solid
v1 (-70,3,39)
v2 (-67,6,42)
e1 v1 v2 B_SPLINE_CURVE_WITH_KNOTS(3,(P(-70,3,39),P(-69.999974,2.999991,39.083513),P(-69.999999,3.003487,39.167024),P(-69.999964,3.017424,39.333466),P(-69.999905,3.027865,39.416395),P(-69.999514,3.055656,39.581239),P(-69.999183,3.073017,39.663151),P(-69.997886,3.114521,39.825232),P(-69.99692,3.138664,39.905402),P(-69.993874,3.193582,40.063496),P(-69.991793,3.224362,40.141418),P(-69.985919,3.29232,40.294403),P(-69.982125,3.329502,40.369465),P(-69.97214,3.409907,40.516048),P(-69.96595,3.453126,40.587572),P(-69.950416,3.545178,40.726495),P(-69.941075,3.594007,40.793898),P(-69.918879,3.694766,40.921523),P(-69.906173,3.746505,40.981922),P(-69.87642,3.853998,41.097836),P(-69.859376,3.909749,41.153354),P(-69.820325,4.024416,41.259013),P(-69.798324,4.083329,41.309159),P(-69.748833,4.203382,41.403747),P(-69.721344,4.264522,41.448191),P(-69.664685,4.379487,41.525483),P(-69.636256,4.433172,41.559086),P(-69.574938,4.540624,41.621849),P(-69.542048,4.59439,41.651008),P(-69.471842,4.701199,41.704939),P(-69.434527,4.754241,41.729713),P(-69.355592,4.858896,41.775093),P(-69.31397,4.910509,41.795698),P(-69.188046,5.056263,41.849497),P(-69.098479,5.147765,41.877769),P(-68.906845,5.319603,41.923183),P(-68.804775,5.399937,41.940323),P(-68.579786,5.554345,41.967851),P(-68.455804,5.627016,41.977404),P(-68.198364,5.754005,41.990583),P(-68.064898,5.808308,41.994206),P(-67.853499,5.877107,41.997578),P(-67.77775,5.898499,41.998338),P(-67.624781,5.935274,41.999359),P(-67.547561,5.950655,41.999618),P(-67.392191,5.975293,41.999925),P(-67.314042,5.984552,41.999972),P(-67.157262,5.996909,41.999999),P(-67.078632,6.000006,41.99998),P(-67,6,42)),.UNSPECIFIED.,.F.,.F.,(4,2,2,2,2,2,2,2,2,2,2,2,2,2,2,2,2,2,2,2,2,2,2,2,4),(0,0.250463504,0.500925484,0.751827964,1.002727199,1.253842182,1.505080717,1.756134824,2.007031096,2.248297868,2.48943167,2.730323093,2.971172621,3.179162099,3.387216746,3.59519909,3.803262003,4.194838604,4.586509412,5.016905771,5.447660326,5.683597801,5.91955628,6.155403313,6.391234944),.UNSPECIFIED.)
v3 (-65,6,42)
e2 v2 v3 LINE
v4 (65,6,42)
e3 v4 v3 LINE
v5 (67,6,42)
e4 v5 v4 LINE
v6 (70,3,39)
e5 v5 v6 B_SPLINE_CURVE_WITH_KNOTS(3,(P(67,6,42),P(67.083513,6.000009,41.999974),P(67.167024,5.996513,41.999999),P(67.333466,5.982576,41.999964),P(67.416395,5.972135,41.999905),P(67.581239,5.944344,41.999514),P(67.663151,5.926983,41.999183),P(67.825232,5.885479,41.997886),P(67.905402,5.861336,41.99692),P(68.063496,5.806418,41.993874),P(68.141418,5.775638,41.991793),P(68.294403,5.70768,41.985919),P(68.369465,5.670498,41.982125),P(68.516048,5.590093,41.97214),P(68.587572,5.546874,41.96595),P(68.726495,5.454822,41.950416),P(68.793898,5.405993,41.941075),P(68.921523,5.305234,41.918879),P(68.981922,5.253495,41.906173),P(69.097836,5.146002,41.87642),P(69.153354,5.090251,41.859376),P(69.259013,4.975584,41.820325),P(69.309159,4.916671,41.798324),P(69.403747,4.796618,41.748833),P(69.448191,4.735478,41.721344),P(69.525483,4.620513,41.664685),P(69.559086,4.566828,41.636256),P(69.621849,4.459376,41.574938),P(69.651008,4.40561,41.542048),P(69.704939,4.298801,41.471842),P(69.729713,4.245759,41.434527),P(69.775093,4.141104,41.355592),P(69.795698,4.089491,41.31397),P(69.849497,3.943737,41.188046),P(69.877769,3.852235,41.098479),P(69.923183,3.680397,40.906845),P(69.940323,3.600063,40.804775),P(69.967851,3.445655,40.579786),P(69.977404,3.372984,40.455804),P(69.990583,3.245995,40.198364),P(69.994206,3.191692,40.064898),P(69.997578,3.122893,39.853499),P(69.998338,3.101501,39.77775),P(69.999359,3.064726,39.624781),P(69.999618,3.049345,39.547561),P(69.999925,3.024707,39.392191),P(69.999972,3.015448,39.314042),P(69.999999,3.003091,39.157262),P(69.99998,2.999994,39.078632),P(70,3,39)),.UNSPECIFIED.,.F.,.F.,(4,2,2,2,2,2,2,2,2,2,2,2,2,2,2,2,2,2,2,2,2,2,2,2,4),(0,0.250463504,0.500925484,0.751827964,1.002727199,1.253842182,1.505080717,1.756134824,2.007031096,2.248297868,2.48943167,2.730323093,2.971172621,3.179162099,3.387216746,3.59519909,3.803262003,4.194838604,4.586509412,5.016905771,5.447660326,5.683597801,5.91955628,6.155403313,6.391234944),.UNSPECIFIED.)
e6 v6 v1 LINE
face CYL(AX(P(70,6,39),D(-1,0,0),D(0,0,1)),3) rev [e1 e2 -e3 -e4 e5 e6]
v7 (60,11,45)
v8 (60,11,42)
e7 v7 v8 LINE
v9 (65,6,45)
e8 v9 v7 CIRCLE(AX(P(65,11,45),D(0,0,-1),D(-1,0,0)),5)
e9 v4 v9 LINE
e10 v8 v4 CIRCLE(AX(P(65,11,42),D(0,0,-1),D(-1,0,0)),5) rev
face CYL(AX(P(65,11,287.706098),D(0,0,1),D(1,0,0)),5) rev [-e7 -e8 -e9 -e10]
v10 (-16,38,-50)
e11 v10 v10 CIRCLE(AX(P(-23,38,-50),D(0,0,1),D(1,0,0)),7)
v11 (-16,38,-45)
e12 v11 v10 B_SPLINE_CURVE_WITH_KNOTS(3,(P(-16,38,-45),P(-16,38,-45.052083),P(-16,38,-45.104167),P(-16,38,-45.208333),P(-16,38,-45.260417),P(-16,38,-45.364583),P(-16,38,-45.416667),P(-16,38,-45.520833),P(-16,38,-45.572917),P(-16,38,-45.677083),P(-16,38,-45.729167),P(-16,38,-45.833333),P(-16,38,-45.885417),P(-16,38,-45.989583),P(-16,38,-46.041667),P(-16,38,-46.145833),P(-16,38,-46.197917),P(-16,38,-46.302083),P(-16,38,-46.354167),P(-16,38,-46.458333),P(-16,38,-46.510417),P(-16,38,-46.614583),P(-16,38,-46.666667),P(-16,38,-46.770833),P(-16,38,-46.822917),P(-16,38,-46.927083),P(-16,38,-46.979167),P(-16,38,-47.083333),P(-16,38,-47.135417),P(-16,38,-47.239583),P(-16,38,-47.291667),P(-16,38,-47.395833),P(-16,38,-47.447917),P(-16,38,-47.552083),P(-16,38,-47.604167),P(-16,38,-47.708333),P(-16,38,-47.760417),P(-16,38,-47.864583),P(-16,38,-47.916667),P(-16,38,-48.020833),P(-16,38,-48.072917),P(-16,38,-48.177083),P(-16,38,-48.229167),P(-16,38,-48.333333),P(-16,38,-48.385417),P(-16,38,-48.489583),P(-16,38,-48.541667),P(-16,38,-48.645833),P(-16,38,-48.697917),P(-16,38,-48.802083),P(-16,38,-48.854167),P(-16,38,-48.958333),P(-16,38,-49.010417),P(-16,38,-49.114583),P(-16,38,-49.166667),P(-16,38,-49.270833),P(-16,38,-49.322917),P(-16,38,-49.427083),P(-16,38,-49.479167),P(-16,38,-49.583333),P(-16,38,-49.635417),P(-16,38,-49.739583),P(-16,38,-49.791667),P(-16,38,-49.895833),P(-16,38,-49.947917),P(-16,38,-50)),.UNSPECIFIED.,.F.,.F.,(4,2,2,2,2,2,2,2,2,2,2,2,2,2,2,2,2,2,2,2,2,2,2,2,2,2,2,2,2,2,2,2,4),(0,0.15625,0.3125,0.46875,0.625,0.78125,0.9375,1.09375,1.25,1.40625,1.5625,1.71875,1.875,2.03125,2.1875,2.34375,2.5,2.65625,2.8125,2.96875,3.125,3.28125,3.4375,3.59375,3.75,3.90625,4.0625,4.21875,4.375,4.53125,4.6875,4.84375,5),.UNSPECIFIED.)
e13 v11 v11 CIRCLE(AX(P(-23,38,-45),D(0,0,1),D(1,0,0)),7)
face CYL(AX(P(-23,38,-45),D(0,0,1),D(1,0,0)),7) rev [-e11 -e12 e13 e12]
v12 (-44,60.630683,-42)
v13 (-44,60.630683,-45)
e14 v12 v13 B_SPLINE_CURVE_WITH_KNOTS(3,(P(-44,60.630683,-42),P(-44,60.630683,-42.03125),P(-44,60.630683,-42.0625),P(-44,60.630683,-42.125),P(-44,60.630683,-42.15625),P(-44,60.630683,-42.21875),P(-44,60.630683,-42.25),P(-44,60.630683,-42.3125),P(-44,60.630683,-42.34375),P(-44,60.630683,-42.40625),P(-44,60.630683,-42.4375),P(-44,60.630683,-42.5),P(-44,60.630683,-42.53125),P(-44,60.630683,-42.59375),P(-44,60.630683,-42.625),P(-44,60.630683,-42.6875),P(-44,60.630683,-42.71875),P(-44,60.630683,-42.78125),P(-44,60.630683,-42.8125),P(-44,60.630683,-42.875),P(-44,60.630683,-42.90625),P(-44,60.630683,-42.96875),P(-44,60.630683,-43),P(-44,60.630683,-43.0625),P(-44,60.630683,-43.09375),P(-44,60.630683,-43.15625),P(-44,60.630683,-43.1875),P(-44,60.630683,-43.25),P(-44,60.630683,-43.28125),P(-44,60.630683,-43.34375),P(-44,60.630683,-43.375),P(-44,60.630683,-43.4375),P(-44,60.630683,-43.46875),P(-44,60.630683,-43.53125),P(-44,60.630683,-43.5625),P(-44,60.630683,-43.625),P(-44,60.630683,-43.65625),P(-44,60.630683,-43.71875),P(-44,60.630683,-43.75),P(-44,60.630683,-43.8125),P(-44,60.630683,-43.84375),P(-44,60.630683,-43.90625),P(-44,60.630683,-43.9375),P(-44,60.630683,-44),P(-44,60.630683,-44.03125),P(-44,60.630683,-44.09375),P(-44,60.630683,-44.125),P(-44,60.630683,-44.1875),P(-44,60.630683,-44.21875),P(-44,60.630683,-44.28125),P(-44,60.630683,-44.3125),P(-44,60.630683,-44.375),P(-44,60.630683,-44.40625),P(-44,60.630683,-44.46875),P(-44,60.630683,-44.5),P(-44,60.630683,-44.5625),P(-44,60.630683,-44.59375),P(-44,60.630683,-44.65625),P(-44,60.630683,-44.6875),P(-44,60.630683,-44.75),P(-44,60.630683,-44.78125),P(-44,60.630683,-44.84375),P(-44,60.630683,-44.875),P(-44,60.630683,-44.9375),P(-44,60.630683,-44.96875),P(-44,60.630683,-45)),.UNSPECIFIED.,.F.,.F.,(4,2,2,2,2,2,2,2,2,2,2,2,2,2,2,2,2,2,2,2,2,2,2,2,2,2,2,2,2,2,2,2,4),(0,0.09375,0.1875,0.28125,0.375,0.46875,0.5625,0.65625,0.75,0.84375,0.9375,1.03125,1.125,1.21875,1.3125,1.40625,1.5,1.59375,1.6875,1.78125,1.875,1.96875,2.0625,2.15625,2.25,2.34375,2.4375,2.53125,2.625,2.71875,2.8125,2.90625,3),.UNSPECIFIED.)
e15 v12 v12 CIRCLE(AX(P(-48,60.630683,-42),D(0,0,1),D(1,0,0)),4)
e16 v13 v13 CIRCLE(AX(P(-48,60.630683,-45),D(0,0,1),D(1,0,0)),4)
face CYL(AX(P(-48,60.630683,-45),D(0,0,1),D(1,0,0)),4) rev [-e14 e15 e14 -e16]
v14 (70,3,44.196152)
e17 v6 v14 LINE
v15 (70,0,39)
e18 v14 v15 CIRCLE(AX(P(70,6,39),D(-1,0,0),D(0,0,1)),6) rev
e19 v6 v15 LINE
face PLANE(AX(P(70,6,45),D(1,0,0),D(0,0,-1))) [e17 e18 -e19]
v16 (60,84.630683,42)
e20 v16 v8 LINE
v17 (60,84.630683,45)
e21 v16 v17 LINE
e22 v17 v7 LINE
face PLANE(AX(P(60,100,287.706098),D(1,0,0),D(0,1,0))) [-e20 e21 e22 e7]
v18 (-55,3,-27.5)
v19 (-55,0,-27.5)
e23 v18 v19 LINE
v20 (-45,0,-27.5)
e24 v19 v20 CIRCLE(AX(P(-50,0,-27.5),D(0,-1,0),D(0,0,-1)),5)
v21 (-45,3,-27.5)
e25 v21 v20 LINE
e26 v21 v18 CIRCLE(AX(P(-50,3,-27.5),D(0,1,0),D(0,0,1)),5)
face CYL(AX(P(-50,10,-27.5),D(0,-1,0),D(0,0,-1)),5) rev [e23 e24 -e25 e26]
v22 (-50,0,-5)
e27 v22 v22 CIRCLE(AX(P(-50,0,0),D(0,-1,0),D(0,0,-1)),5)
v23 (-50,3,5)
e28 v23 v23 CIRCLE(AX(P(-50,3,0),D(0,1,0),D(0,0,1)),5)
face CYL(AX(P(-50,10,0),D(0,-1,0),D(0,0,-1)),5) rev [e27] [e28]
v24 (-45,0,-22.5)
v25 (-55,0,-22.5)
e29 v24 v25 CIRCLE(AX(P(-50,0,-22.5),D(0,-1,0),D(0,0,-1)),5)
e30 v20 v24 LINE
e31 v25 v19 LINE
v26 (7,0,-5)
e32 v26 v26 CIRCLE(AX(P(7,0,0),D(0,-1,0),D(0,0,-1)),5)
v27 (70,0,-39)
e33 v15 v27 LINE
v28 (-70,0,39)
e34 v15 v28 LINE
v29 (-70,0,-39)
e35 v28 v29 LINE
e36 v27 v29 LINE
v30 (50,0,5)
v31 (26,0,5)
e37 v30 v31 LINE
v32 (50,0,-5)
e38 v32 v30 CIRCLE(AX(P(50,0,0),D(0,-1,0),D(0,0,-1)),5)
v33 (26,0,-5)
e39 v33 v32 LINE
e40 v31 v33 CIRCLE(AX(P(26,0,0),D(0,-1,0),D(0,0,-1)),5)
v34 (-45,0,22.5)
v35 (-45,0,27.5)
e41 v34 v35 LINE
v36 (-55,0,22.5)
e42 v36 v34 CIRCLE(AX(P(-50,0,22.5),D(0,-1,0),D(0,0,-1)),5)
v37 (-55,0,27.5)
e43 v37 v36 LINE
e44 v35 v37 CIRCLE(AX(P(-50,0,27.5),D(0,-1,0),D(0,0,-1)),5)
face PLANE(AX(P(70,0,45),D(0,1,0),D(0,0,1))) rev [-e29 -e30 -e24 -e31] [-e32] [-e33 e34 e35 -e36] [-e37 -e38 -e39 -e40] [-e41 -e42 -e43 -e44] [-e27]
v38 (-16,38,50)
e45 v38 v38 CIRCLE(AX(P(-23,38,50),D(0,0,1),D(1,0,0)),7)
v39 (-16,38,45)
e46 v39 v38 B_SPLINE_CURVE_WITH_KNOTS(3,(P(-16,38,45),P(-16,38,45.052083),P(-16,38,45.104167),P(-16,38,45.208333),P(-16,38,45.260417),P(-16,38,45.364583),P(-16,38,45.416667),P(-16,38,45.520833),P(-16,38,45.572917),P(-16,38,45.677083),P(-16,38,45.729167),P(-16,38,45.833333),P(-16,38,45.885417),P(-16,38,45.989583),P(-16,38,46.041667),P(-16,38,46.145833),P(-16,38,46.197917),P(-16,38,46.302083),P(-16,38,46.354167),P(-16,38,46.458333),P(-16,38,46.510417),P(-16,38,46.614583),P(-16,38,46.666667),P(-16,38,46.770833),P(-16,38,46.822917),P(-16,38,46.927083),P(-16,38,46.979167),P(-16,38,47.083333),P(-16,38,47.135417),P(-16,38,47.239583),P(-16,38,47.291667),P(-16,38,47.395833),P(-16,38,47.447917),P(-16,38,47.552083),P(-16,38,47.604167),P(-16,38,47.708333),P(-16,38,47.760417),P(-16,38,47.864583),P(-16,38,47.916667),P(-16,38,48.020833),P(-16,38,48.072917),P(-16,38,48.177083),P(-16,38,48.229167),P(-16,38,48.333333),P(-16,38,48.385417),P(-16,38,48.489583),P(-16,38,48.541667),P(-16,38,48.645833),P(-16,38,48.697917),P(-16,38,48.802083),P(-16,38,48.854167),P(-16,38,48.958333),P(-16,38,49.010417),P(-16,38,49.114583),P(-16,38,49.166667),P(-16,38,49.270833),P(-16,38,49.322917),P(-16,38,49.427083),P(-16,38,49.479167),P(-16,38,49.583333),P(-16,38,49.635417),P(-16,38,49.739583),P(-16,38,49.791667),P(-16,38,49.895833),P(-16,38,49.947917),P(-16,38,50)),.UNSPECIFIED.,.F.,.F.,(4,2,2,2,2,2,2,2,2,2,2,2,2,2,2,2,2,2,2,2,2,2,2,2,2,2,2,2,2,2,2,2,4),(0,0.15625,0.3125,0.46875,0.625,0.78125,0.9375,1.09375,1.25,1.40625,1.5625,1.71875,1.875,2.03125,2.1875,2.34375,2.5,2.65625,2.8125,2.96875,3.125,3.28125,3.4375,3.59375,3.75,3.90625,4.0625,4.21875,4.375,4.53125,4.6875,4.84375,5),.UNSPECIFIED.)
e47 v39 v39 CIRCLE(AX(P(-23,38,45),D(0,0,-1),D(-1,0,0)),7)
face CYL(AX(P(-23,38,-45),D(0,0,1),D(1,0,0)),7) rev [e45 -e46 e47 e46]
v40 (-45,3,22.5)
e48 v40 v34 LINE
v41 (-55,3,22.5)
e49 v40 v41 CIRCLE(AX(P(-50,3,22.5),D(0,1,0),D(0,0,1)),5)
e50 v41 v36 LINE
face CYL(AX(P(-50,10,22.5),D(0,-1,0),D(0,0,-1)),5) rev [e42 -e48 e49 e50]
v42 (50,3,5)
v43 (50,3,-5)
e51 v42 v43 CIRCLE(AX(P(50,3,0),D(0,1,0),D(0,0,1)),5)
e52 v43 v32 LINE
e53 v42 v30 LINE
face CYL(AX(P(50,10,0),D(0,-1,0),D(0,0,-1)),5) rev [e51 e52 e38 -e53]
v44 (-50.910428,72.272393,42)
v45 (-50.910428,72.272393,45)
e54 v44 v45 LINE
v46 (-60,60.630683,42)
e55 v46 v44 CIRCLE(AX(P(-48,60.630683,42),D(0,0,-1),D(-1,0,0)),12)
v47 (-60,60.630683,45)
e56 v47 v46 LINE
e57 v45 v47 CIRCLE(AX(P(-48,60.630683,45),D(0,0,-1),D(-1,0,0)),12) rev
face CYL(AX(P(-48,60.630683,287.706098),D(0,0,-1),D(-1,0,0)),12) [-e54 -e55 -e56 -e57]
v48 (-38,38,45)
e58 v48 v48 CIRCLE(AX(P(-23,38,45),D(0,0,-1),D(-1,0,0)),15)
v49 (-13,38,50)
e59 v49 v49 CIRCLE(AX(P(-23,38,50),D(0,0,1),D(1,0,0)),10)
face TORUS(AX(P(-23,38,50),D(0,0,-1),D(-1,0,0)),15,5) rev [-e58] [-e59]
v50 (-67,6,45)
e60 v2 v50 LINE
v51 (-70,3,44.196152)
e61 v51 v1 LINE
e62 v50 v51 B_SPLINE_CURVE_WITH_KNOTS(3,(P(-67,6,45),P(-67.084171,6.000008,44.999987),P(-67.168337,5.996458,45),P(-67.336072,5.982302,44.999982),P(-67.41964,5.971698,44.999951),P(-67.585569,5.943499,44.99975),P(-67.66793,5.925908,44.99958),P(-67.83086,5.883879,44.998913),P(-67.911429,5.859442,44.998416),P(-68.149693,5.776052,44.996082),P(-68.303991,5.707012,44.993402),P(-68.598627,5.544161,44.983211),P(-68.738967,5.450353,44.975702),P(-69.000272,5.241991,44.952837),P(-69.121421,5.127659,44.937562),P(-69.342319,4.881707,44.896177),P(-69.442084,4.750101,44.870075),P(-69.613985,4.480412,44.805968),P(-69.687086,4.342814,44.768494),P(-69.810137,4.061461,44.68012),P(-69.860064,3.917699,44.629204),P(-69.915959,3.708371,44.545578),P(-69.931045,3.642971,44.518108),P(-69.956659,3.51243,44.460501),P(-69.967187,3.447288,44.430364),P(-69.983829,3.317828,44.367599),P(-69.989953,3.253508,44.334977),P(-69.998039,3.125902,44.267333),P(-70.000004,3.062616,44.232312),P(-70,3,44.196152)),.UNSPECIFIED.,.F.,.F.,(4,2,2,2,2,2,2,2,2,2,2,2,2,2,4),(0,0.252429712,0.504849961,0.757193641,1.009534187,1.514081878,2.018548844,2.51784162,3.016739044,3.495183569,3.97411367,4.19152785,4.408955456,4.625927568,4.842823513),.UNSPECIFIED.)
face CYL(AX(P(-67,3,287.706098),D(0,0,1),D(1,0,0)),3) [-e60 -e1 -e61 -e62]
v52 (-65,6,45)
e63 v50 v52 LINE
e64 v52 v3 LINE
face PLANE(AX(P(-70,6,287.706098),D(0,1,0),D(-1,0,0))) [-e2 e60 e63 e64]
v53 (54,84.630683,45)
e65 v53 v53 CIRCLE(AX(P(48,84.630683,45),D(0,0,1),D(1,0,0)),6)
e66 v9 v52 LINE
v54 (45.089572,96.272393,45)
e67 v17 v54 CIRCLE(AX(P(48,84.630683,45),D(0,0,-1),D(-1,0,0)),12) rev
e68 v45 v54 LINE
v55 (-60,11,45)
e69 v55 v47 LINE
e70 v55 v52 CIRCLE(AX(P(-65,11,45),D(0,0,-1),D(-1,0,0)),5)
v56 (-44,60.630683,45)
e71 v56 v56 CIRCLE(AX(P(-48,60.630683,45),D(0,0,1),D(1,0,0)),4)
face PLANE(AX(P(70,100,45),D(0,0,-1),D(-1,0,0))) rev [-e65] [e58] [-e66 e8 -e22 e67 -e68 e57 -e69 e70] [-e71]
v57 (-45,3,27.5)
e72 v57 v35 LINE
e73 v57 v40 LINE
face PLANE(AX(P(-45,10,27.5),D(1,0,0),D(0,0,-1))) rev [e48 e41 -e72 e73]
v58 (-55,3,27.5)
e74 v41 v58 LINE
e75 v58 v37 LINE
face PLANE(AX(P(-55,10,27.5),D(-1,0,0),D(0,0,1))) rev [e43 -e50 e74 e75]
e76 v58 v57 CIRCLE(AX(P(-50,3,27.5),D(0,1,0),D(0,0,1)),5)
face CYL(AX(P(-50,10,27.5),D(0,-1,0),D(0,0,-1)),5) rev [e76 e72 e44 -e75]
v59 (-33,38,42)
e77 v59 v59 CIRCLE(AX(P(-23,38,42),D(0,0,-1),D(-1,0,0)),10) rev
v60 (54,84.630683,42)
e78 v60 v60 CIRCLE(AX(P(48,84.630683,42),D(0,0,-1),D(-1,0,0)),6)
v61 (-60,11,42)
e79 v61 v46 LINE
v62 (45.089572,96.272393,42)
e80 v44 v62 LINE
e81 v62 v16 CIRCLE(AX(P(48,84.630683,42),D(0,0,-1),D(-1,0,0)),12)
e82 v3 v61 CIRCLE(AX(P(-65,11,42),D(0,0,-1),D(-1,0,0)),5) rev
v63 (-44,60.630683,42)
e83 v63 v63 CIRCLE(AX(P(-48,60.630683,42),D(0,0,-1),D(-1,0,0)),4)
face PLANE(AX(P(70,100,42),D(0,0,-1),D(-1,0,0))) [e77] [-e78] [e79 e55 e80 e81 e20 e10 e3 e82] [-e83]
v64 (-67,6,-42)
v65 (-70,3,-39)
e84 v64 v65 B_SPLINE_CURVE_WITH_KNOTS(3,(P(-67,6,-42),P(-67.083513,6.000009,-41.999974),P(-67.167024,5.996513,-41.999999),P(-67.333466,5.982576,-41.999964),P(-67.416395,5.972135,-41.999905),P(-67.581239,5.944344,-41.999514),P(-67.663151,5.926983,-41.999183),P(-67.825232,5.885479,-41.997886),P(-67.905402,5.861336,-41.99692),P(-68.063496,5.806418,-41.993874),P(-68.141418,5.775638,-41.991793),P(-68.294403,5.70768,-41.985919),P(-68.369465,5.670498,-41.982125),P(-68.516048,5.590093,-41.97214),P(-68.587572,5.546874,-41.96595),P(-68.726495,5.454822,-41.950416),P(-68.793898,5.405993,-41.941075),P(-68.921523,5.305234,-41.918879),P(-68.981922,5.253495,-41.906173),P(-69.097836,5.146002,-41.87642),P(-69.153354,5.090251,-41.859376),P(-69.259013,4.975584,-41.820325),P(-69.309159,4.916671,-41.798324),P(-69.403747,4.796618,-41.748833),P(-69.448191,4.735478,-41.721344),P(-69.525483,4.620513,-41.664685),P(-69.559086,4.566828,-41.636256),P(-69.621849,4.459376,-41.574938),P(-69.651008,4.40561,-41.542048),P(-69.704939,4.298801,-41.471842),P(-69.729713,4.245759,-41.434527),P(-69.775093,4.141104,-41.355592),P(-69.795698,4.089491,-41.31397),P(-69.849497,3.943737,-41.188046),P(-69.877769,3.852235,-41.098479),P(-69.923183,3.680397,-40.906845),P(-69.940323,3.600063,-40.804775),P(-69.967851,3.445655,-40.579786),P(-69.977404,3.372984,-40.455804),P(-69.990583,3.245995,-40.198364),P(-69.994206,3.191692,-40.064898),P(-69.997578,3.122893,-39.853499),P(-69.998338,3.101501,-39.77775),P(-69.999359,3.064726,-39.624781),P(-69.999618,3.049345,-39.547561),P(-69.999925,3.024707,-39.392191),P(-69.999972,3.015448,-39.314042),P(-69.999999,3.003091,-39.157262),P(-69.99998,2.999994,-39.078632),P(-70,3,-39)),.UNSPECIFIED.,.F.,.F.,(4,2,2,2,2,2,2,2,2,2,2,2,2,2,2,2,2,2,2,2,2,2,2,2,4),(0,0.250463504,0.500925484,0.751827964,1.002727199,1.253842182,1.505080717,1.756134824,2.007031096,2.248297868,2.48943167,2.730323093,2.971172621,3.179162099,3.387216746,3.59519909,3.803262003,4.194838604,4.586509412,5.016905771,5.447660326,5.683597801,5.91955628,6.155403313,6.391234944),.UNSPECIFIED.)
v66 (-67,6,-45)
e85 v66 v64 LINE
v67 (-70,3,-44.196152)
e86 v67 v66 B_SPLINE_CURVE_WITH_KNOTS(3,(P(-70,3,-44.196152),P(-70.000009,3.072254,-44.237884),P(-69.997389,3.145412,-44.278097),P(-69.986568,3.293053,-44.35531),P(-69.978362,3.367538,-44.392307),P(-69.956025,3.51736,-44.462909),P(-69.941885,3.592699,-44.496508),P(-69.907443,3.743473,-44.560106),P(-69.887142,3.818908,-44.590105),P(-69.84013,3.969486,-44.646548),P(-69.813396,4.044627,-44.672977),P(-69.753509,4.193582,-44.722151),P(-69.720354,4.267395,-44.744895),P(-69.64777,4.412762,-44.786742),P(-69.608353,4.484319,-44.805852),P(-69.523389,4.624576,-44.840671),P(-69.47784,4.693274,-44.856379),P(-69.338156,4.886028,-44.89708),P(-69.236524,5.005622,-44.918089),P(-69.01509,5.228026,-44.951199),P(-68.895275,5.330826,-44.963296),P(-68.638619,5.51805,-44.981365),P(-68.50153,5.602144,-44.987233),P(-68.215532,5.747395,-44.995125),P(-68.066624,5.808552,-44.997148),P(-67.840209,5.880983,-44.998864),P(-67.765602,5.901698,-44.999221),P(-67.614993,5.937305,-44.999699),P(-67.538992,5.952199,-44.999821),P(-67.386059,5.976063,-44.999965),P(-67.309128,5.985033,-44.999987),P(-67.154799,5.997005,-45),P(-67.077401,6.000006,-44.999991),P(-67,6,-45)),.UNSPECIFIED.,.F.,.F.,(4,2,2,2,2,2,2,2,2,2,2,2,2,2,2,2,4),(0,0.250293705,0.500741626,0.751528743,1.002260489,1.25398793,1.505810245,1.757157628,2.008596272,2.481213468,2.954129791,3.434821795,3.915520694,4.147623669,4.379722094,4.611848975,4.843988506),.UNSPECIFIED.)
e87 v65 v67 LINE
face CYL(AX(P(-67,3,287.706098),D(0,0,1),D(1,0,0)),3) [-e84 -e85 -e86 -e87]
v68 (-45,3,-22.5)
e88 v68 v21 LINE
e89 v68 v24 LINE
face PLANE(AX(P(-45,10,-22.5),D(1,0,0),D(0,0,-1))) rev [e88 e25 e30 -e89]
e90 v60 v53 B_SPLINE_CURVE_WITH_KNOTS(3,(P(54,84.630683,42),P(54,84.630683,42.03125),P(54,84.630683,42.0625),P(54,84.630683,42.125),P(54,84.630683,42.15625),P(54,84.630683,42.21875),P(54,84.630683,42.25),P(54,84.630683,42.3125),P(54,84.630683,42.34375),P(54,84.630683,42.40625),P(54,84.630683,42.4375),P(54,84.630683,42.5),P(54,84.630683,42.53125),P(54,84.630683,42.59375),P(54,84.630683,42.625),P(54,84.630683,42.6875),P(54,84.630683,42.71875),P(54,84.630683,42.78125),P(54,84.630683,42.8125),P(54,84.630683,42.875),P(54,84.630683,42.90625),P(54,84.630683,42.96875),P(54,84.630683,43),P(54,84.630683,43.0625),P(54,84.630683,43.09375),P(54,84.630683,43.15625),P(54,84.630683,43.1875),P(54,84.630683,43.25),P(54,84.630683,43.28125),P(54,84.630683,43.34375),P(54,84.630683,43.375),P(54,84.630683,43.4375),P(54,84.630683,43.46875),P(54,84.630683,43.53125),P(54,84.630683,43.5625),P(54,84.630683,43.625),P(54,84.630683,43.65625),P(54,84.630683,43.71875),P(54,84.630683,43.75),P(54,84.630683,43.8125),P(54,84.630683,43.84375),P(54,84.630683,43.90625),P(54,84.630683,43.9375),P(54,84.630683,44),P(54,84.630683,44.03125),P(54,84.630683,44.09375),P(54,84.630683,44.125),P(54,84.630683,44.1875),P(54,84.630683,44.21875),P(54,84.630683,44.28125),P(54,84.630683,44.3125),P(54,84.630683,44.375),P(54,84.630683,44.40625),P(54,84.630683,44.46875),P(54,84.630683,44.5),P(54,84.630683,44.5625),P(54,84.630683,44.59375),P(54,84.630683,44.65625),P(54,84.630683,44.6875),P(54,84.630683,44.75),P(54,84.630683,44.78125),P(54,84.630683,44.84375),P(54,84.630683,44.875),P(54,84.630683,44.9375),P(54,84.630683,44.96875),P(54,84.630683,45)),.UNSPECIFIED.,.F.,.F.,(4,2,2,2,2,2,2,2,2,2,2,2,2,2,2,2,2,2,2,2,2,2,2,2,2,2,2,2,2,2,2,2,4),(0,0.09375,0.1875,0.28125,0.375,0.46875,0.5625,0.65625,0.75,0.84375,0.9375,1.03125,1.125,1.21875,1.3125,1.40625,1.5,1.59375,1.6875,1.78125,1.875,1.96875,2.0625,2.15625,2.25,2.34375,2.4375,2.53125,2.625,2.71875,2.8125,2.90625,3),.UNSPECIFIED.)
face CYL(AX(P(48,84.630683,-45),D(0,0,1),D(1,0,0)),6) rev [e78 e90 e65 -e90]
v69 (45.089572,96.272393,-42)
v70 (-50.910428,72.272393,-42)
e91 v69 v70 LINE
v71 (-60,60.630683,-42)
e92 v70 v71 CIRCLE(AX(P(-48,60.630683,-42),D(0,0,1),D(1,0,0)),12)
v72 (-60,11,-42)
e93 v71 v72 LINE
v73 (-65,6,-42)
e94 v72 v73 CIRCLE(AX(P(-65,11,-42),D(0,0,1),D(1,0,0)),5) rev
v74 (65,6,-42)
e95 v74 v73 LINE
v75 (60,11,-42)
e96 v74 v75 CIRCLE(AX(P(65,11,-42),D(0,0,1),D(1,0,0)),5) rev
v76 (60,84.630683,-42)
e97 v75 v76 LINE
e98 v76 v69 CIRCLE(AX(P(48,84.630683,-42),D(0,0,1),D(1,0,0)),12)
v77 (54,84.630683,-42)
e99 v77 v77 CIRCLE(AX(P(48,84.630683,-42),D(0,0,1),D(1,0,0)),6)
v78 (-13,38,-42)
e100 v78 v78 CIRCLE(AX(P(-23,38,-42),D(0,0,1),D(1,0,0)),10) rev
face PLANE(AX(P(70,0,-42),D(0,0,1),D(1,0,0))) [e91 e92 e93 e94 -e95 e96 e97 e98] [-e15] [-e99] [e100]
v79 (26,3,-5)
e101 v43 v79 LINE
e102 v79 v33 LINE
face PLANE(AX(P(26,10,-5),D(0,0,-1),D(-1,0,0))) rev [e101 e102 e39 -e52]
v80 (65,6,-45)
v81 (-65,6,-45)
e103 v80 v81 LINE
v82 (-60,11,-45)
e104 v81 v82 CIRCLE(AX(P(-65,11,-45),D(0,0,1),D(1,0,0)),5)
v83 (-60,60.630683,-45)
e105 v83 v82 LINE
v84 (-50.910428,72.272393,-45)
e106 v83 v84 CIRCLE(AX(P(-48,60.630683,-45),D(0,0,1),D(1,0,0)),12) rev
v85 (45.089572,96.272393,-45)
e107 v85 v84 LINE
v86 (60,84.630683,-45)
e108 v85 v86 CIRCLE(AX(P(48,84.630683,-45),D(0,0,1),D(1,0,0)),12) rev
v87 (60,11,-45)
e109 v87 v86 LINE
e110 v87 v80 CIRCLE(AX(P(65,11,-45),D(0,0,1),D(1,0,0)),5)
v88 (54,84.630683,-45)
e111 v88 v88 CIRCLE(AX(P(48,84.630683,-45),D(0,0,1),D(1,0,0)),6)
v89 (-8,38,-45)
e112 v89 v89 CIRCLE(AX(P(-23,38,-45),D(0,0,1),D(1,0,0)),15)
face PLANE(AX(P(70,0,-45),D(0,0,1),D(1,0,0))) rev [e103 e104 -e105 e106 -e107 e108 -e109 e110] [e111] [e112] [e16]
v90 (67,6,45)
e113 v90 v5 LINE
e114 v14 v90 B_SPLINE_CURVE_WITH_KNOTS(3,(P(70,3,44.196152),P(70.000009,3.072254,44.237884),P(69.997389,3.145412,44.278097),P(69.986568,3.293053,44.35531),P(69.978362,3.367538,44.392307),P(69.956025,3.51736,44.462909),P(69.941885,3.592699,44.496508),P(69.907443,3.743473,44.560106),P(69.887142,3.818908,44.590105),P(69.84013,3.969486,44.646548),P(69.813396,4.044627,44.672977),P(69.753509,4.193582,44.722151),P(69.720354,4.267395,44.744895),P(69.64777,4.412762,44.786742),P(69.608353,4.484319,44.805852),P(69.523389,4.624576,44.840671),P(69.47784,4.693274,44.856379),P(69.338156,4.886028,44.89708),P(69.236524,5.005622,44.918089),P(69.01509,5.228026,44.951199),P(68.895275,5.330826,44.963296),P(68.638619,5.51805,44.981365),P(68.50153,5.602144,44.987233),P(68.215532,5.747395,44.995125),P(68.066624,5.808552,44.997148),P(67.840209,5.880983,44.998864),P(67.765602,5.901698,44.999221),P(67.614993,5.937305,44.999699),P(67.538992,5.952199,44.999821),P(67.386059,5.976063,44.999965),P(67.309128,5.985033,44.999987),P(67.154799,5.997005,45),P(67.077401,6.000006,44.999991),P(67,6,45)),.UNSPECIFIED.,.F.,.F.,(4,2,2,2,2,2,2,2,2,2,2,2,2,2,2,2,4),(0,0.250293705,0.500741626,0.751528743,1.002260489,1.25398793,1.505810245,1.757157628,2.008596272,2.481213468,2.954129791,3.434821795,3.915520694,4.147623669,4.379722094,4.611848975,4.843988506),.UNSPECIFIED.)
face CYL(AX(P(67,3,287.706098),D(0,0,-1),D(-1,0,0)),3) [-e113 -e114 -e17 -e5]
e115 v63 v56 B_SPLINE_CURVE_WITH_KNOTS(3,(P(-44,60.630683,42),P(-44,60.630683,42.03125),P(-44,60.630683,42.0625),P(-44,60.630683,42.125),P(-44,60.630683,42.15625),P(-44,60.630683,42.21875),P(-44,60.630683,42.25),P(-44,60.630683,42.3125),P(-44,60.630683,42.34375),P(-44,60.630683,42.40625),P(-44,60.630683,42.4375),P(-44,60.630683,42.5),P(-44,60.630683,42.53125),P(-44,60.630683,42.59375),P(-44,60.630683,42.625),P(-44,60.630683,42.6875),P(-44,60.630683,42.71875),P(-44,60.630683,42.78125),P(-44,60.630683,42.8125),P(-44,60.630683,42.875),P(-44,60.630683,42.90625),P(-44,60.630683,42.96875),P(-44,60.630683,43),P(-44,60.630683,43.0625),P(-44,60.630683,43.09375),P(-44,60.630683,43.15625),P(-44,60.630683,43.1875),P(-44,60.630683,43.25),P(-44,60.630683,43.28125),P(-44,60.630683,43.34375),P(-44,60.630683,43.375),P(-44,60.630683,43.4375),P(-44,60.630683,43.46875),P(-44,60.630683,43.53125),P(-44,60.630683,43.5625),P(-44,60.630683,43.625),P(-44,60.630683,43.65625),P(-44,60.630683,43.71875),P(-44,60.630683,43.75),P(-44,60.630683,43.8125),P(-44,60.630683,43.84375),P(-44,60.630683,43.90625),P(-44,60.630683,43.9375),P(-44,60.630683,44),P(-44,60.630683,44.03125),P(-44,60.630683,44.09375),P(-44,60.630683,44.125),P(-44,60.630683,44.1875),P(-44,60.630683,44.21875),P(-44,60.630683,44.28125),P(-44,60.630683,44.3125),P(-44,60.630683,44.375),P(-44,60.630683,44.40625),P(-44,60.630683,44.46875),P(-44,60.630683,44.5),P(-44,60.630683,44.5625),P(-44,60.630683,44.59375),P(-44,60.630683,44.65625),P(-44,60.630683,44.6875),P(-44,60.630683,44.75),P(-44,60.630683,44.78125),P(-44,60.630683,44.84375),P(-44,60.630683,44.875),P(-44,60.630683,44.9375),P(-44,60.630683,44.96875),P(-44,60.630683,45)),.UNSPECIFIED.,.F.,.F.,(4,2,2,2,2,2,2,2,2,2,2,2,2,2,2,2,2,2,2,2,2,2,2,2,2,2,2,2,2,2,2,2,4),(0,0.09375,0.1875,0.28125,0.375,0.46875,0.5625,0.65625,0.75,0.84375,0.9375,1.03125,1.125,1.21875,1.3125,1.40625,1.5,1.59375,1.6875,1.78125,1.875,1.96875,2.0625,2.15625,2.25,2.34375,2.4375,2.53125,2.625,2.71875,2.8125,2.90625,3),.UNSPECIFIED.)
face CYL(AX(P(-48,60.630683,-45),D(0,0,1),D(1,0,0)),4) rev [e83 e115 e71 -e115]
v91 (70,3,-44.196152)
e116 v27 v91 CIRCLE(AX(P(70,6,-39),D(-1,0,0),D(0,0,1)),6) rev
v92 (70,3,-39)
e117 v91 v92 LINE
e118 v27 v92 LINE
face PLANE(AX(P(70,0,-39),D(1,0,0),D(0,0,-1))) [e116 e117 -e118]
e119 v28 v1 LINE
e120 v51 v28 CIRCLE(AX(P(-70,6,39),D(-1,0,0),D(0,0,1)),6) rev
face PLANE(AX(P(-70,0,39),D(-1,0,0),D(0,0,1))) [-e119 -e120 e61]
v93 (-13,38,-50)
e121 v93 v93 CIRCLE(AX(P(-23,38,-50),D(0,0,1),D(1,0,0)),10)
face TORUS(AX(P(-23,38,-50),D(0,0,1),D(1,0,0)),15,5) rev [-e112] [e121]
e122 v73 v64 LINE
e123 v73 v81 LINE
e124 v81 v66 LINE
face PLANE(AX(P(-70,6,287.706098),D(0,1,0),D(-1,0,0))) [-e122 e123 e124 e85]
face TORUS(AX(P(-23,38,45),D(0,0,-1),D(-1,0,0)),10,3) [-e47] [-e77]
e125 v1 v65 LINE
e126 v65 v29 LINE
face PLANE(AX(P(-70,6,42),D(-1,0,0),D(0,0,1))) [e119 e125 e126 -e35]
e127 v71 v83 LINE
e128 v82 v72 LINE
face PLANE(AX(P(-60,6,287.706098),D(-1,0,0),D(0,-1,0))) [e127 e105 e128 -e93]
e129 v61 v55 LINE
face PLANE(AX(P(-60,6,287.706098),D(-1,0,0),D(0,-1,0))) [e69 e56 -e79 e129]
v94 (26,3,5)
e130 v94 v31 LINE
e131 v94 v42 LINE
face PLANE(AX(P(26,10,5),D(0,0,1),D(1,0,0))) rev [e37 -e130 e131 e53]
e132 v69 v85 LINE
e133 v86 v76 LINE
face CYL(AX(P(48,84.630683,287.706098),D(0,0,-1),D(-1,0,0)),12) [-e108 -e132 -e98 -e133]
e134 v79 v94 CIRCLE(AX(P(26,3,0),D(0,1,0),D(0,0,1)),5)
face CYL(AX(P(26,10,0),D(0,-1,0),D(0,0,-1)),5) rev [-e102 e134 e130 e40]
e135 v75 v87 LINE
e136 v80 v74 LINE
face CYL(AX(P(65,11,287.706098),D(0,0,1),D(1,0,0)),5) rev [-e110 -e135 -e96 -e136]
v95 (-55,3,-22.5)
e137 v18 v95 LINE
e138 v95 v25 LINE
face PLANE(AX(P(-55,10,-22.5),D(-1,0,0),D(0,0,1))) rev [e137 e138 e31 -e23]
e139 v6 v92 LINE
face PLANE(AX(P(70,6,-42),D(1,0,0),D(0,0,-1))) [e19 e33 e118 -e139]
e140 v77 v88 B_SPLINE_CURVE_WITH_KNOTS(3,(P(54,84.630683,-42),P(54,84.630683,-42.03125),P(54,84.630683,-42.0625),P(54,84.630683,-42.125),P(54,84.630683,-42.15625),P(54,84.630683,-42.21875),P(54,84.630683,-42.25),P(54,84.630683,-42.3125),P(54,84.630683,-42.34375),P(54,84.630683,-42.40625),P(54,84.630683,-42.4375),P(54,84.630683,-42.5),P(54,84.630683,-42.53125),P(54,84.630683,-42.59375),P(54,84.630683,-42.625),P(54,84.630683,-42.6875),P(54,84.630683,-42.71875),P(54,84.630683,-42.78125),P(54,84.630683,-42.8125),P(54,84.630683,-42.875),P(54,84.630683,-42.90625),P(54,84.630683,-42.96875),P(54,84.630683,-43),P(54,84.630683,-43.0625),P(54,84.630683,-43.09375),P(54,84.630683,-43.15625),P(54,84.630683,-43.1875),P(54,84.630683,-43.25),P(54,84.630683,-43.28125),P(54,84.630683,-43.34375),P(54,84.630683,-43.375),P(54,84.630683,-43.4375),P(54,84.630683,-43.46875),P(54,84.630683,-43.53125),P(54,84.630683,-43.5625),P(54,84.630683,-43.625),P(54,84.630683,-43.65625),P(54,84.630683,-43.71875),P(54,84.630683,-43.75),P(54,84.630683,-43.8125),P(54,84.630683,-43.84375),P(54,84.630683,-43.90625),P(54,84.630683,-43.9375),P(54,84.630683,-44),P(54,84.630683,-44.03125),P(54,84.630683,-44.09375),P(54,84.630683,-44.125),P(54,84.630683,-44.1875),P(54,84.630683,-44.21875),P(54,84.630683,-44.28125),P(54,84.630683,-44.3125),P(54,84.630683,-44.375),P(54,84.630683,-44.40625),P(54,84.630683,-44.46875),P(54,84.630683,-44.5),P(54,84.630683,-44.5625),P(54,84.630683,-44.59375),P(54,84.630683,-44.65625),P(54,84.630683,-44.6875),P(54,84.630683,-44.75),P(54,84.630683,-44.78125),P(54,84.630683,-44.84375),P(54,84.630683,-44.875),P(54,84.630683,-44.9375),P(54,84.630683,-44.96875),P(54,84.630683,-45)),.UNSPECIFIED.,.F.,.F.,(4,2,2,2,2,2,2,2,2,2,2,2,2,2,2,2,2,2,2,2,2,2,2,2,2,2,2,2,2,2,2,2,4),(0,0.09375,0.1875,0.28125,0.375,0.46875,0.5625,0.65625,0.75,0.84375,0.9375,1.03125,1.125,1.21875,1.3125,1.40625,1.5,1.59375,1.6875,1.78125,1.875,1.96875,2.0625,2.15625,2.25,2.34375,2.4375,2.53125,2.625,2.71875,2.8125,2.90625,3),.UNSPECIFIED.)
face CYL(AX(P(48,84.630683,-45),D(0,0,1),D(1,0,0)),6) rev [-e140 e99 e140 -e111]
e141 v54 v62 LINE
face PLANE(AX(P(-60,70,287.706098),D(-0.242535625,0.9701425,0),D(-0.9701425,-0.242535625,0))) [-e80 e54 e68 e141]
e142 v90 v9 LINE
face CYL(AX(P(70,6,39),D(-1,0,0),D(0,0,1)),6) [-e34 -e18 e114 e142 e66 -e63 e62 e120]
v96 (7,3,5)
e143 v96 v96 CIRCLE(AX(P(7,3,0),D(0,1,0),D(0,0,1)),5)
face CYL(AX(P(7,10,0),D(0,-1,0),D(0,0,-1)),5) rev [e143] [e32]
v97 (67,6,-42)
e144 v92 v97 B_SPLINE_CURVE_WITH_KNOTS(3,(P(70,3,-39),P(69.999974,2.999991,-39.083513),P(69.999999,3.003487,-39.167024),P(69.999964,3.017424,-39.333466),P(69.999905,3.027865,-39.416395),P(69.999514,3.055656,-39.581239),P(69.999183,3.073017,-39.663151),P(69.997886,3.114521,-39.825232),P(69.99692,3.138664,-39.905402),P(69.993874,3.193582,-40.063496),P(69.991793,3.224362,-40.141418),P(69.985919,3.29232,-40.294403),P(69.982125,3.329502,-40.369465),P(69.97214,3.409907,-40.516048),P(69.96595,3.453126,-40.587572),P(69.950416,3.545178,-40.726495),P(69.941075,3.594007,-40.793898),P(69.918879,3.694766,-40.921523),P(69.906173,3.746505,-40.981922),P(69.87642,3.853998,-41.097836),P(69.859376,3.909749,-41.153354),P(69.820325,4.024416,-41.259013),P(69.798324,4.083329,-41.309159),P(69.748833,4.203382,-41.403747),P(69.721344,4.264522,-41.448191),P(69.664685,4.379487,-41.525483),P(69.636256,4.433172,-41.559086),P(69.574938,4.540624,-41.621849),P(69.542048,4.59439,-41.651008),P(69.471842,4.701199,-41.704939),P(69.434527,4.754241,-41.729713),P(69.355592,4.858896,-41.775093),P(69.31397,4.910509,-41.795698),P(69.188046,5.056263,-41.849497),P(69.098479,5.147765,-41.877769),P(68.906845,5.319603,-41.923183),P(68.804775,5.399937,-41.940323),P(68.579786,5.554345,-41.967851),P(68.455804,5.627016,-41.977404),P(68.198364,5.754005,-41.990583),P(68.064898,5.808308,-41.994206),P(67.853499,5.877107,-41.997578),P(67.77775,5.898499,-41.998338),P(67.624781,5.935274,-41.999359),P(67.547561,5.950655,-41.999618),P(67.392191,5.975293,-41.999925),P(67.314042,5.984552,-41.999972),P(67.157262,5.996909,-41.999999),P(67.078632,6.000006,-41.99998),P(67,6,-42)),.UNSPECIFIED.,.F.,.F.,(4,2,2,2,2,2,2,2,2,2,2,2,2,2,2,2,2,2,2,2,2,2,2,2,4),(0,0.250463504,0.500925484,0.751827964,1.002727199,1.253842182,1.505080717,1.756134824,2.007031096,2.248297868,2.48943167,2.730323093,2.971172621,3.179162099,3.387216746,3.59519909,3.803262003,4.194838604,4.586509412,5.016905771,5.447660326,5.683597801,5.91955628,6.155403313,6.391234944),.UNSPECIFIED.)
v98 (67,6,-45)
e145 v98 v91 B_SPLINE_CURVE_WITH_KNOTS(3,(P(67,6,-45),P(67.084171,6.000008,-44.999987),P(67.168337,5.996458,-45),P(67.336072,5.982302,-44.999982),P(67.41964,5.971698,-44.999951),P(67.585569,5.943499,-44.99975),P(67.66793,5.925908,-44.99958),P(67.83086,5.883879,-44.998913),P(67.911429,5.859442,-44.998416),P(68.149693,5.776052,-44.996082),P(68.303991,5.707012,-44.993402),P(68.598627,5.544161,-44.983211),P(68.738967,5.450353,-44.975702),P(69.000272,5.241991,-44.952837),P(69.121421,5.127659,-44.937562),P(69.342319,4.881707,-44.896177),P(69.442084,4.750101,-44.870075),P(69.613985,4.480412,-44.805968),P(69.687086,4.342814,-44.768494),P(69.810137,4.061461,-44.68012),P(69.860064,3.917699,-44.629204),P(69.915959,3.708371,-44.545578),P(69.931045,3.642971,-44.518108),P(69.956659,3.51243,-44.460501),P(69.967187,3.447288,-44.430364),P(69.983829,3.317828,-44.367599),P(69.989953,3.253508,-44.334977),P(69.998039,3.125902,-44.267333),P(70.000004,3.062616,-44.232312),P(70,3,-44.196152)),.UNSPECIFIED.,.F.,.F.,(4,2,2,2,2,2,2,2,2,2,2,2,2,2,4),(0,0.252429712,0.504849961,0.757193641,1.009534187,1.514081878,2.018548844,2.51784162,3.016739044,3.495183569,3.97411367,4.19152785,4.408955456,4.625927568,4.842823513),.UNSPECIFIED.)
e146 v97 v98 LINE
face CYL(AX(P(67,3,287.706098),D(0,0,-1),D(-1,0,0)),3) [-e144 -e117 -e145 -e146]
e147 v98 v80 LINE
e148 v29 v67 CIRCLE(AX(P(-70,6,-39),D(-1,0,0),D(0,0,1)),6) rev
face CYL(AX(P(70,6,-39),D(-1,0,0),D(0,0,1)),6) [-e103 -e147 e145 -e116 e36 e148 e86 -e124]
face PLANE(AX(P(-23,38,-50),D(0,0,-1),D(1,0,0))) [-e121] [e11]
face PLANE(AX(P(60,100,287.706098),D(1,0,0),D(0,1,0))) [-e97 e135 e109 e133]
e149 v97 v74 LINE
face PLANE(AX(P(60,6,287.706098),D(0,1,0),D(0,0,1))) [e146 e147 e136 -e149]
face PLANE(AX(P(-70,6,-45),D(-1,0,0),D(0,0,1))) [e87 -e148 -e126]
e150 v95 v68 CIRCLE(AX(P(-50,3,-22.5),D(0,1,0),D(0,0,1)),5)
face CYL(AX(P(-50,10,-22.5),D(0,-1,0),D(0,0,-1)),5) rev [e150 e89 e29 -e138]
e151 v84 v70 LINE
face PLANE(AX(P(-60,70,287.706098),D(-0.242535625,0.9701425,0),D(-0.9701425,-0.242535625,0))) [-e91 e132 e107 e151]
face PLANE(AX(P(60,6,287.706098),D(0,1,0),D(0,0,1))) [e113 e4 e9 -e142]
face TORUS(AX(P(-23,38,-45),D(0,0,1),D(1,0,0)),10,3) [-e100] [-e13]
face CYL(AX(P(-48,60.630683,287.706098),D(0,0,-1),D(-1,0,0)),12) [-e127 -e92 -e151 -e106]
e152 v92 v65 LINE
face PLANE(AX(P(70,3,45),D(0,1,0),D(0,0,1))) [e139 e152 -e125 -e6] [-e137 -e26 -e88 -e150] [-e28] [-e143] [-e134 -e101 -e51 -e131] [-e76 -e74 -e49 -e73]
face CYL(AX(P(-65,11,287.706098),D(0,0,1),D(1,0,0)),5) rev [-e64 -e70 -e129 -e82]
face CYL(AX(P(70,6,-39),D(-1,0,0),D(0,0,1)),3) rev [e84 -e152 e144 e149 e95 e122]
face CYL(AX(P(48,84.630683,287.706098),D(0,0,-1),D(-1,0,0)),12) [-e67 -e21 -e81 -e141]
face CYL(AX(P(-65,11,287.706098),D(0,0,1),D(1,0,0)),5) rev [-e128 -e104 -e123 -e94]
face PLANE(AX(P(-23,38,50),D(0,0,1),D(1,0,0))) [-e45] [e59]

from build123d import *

# Parameters (mm, degrees)
BASE_FLANGE1_DEPTH      = 70
CUT_EXTRUDE1_DEPTH      = 152.657508881
CUT_EXTRUDE1_DEPTH_BACK = 152.657508881
FILLET1_R               = 12
SKETCH7_R               = 4
SKETCH7_R_2             = 6
SKETCH7_R_3             = 7
CUT_EXTRUDE2_DEPTH      = 150.457314712
SKETCH8_R               = 5
CUT_EXTRUDE3_DEPTH      = 10
FILLET2_R               = 3
BOSS_EXTRUDE1_START     = 5
SKETCH9_R               = 10
SKETCH9_R_2             = 7
BOSS_EXTRUDE1_DEPTH     = 5
FILLET3_R               = 5
FILLET4_R               = 3
FILLET5_R               = 3
FILLET6_R               = 5
FILLET7_R               = 5


# Sheet-metal steps are written as plain solids
with BuildPart() as part:
    # Sketch1 → Base-Flange1 (new, symmetric)
    with BuildSketch(Plane(origin=(0, 0, 0), x_dir=(0, 0, -1), z_dir=(1, 0, 0))):
        with BuildLine():
            Line((-45, 100), (-45, 6))
            ThreePointArc((-45, 6), (-43.242640687, 1.757359313), (-39, 0))
            Line((-39, 0), (39, 0))
            ThreePointArc((39, 0), (43.242640687, 1.757359313), (45, 6))
            Line((45, 6), (45, 100))
            Line((45, 100), (42, 100))
            Line((42, 100), (42, 6))
            ThreePointArc((42, 6), (41.121320344, 3.878679656), (39, 3))
            Line((39, 3), (-39, 3))
            ThreePointArc((-39, 3), (-41.121320344, 3.878679656), (-42, 6))
            Line((-42, 6), (-42, 100))
            Line((-42, 100), (-45, 100))
        make_face()
    extrude(amount=BASE_FLANGE1_DEPTH, both=True)

    # Sketch6 → Cut-Extrude1 (cut, two sides: drawn at the far end of the back side and taken through both)
    with BuildSketch(Plane.XY.offset(45).offset(-CUT_EXTRUDE1_DEPTH_BACK)):
        Polygon((-417.259543972, 6), (-70, 6), (-60, 6), (-60, 70), (60, 100), (60, 6), (70, 6), (417.259543972, 6), (417.259543972, 700.519087943), (-417.259543972, 700.519087943), align=None)
    extrude(amount=CUT_EXTRUDE1_DEPTH + CUT_EXTRUDE1_DEPTH_BACK, mode=Mode.SUBTRACT)

    # Fillet1
    fillet1_edges = [part.edges().sort_by_distance(p)[0] for p in [
        (60, 100, -43.5),
        (60, 100, 43.5),
        (-60, 70, -43.5),
        (-60, 70, 43.5),
    ]]
    fillet(fillet1_edges, radius=FILLET1_R)

    # Sketch7 → Cut-Extrude2 (cut, through all)
    with BuildSketch(Plane.XY.offset(45)):
        with Locations((-48, 60.630683123)):
            Circle(SKETCH7_R)
        with Locations((48, 84.630683123)):
            Circle(SKETCH7_R_2)
        with Locations((-23, 38)):
            Circle(SKETCH7_R_3)
    extrude(amount=-CUT_EXTRUDE2_DEPTH, mode=Mode.SUBTRACT)

    # Sketch8 → Cut-Extrude3 (cut)
    with BuildSketch(Plane.XZ):
        with Locations(Location((7, 0, 0), (0, 0, 270))):
            Circle(SKETCH8_R)
        with Locations(Location((-50, 0, 0), (0, 0, 270))):
            Circle(SKETCH8_R)
        with BuildLine():
            Line((26, 5), (50, 5))
            ThreePointArc((50, 5), (55, 0), (50, -5))
            Line((50, -5), (26, -5))
            ThreePointArc((26, -5), (21, 0), (26, 5))
        make_face()
        with BuildLine():
            Line((-45, 27.5), (-45, 22.5))
            ThreePointArc((-45, 22.5), (-50, 17.5), (-55, 22.5))
            Line((-55, 22.5), (-55, 27.5))
            ThreePointArc((-55, 27.5), (-50, 32.5), (-45, 27.5))
        make_face()
        with BuildLine():
            Line((-45, -22.5), (-45, -27.5))
            ThreePointArc((-45, -27.5), (-50, -32.5), (-55, -27.5))
            Line((-55, -27.5), (-55, -22.5))
            ThreePointArc((-55, -22.5), (-50, -17.5), (-45, -22.5))
        make_face()
    extrude(amount=-CUT_EXTRUDE3_DEPTH, mode=Mode.SUBTRACT)

    # Fillet2
    fillet2_edges = [part.edges().sort_by_distance(p)[0] for p in [
        (-70, 6, -43.5),
        (70, 6, -43.5),
        (-70, 6, 43.5),
        (70, 6, 43.5),
    ]]
    fillet(fillet2_edges, radius=FILLET2_R - 0.0001)  # a hair under: the kernel refuses the full size

    # Sketch9 → Boss-Extrude1 (add)
    with BuildSketch(Plane.XY.offset(45).offset(BOSS_EXTRUDE1_START)):
        with Locations(Location((-23, 38, 0), (0, 0, 180))):
            Circle(SKETCH9_R)
        with Locations((-23, 38)):
            Circle(SKETCH9_R_2, mode=Mode.SUBTRACT)
    boss_extrude1 = extrude(amount=-BOSS_EXTRUDE1_DEPTH)

    # Fillet3
    fillet3_edges = [part.edges().sort_by_distance(p)[0] for p in [
        (-13, 38, 45),
    ]]
    fillet(fillet3_edges, radius=FILLET3_R - 0.0001)  # a hair under: the kernel refuses the full size

    # Fillet4
    fillet4_edges = [part.edges().sort_by_distance(p)[0] for p in [
        (-30, 38, 42),
    ]]
    fillet(fillet4_edges, radius=FILLET4_R)

    # Mirror5: Boss-Extrude1 across plane
    add(boss_extrude1.mirror(Plane.XY))

    # Fillet5
    fillet5_edges = [part.edges().sort_by_distance(p)[0] for p in [
        (-30, 38, -42),
    ]]
    fillet(fillet5_edges, radius=FILLET5_R)

    # Fillet6
    fillet6_edges = [part.edges().sort_by_distance(p)[0] for p in [
        (-13, 38, -45),
    ]]
    fillet(fillet6_edges, radius=FILLET6_R - 0.0001)  # a hair under: the kernel refuses the full size

    # Fillet7
    fillet7_edges = [part.edges().sort_by_distance(p)[0] for p in [
        (60, 6, -43.5),
        (60, 6, 43.5),
        (-60, 6, -43.5),
        (-60, 6, 43.5),
    ]]
    fillet(fillet7_edges, radius=FILLET7_R)


solid = part.part
